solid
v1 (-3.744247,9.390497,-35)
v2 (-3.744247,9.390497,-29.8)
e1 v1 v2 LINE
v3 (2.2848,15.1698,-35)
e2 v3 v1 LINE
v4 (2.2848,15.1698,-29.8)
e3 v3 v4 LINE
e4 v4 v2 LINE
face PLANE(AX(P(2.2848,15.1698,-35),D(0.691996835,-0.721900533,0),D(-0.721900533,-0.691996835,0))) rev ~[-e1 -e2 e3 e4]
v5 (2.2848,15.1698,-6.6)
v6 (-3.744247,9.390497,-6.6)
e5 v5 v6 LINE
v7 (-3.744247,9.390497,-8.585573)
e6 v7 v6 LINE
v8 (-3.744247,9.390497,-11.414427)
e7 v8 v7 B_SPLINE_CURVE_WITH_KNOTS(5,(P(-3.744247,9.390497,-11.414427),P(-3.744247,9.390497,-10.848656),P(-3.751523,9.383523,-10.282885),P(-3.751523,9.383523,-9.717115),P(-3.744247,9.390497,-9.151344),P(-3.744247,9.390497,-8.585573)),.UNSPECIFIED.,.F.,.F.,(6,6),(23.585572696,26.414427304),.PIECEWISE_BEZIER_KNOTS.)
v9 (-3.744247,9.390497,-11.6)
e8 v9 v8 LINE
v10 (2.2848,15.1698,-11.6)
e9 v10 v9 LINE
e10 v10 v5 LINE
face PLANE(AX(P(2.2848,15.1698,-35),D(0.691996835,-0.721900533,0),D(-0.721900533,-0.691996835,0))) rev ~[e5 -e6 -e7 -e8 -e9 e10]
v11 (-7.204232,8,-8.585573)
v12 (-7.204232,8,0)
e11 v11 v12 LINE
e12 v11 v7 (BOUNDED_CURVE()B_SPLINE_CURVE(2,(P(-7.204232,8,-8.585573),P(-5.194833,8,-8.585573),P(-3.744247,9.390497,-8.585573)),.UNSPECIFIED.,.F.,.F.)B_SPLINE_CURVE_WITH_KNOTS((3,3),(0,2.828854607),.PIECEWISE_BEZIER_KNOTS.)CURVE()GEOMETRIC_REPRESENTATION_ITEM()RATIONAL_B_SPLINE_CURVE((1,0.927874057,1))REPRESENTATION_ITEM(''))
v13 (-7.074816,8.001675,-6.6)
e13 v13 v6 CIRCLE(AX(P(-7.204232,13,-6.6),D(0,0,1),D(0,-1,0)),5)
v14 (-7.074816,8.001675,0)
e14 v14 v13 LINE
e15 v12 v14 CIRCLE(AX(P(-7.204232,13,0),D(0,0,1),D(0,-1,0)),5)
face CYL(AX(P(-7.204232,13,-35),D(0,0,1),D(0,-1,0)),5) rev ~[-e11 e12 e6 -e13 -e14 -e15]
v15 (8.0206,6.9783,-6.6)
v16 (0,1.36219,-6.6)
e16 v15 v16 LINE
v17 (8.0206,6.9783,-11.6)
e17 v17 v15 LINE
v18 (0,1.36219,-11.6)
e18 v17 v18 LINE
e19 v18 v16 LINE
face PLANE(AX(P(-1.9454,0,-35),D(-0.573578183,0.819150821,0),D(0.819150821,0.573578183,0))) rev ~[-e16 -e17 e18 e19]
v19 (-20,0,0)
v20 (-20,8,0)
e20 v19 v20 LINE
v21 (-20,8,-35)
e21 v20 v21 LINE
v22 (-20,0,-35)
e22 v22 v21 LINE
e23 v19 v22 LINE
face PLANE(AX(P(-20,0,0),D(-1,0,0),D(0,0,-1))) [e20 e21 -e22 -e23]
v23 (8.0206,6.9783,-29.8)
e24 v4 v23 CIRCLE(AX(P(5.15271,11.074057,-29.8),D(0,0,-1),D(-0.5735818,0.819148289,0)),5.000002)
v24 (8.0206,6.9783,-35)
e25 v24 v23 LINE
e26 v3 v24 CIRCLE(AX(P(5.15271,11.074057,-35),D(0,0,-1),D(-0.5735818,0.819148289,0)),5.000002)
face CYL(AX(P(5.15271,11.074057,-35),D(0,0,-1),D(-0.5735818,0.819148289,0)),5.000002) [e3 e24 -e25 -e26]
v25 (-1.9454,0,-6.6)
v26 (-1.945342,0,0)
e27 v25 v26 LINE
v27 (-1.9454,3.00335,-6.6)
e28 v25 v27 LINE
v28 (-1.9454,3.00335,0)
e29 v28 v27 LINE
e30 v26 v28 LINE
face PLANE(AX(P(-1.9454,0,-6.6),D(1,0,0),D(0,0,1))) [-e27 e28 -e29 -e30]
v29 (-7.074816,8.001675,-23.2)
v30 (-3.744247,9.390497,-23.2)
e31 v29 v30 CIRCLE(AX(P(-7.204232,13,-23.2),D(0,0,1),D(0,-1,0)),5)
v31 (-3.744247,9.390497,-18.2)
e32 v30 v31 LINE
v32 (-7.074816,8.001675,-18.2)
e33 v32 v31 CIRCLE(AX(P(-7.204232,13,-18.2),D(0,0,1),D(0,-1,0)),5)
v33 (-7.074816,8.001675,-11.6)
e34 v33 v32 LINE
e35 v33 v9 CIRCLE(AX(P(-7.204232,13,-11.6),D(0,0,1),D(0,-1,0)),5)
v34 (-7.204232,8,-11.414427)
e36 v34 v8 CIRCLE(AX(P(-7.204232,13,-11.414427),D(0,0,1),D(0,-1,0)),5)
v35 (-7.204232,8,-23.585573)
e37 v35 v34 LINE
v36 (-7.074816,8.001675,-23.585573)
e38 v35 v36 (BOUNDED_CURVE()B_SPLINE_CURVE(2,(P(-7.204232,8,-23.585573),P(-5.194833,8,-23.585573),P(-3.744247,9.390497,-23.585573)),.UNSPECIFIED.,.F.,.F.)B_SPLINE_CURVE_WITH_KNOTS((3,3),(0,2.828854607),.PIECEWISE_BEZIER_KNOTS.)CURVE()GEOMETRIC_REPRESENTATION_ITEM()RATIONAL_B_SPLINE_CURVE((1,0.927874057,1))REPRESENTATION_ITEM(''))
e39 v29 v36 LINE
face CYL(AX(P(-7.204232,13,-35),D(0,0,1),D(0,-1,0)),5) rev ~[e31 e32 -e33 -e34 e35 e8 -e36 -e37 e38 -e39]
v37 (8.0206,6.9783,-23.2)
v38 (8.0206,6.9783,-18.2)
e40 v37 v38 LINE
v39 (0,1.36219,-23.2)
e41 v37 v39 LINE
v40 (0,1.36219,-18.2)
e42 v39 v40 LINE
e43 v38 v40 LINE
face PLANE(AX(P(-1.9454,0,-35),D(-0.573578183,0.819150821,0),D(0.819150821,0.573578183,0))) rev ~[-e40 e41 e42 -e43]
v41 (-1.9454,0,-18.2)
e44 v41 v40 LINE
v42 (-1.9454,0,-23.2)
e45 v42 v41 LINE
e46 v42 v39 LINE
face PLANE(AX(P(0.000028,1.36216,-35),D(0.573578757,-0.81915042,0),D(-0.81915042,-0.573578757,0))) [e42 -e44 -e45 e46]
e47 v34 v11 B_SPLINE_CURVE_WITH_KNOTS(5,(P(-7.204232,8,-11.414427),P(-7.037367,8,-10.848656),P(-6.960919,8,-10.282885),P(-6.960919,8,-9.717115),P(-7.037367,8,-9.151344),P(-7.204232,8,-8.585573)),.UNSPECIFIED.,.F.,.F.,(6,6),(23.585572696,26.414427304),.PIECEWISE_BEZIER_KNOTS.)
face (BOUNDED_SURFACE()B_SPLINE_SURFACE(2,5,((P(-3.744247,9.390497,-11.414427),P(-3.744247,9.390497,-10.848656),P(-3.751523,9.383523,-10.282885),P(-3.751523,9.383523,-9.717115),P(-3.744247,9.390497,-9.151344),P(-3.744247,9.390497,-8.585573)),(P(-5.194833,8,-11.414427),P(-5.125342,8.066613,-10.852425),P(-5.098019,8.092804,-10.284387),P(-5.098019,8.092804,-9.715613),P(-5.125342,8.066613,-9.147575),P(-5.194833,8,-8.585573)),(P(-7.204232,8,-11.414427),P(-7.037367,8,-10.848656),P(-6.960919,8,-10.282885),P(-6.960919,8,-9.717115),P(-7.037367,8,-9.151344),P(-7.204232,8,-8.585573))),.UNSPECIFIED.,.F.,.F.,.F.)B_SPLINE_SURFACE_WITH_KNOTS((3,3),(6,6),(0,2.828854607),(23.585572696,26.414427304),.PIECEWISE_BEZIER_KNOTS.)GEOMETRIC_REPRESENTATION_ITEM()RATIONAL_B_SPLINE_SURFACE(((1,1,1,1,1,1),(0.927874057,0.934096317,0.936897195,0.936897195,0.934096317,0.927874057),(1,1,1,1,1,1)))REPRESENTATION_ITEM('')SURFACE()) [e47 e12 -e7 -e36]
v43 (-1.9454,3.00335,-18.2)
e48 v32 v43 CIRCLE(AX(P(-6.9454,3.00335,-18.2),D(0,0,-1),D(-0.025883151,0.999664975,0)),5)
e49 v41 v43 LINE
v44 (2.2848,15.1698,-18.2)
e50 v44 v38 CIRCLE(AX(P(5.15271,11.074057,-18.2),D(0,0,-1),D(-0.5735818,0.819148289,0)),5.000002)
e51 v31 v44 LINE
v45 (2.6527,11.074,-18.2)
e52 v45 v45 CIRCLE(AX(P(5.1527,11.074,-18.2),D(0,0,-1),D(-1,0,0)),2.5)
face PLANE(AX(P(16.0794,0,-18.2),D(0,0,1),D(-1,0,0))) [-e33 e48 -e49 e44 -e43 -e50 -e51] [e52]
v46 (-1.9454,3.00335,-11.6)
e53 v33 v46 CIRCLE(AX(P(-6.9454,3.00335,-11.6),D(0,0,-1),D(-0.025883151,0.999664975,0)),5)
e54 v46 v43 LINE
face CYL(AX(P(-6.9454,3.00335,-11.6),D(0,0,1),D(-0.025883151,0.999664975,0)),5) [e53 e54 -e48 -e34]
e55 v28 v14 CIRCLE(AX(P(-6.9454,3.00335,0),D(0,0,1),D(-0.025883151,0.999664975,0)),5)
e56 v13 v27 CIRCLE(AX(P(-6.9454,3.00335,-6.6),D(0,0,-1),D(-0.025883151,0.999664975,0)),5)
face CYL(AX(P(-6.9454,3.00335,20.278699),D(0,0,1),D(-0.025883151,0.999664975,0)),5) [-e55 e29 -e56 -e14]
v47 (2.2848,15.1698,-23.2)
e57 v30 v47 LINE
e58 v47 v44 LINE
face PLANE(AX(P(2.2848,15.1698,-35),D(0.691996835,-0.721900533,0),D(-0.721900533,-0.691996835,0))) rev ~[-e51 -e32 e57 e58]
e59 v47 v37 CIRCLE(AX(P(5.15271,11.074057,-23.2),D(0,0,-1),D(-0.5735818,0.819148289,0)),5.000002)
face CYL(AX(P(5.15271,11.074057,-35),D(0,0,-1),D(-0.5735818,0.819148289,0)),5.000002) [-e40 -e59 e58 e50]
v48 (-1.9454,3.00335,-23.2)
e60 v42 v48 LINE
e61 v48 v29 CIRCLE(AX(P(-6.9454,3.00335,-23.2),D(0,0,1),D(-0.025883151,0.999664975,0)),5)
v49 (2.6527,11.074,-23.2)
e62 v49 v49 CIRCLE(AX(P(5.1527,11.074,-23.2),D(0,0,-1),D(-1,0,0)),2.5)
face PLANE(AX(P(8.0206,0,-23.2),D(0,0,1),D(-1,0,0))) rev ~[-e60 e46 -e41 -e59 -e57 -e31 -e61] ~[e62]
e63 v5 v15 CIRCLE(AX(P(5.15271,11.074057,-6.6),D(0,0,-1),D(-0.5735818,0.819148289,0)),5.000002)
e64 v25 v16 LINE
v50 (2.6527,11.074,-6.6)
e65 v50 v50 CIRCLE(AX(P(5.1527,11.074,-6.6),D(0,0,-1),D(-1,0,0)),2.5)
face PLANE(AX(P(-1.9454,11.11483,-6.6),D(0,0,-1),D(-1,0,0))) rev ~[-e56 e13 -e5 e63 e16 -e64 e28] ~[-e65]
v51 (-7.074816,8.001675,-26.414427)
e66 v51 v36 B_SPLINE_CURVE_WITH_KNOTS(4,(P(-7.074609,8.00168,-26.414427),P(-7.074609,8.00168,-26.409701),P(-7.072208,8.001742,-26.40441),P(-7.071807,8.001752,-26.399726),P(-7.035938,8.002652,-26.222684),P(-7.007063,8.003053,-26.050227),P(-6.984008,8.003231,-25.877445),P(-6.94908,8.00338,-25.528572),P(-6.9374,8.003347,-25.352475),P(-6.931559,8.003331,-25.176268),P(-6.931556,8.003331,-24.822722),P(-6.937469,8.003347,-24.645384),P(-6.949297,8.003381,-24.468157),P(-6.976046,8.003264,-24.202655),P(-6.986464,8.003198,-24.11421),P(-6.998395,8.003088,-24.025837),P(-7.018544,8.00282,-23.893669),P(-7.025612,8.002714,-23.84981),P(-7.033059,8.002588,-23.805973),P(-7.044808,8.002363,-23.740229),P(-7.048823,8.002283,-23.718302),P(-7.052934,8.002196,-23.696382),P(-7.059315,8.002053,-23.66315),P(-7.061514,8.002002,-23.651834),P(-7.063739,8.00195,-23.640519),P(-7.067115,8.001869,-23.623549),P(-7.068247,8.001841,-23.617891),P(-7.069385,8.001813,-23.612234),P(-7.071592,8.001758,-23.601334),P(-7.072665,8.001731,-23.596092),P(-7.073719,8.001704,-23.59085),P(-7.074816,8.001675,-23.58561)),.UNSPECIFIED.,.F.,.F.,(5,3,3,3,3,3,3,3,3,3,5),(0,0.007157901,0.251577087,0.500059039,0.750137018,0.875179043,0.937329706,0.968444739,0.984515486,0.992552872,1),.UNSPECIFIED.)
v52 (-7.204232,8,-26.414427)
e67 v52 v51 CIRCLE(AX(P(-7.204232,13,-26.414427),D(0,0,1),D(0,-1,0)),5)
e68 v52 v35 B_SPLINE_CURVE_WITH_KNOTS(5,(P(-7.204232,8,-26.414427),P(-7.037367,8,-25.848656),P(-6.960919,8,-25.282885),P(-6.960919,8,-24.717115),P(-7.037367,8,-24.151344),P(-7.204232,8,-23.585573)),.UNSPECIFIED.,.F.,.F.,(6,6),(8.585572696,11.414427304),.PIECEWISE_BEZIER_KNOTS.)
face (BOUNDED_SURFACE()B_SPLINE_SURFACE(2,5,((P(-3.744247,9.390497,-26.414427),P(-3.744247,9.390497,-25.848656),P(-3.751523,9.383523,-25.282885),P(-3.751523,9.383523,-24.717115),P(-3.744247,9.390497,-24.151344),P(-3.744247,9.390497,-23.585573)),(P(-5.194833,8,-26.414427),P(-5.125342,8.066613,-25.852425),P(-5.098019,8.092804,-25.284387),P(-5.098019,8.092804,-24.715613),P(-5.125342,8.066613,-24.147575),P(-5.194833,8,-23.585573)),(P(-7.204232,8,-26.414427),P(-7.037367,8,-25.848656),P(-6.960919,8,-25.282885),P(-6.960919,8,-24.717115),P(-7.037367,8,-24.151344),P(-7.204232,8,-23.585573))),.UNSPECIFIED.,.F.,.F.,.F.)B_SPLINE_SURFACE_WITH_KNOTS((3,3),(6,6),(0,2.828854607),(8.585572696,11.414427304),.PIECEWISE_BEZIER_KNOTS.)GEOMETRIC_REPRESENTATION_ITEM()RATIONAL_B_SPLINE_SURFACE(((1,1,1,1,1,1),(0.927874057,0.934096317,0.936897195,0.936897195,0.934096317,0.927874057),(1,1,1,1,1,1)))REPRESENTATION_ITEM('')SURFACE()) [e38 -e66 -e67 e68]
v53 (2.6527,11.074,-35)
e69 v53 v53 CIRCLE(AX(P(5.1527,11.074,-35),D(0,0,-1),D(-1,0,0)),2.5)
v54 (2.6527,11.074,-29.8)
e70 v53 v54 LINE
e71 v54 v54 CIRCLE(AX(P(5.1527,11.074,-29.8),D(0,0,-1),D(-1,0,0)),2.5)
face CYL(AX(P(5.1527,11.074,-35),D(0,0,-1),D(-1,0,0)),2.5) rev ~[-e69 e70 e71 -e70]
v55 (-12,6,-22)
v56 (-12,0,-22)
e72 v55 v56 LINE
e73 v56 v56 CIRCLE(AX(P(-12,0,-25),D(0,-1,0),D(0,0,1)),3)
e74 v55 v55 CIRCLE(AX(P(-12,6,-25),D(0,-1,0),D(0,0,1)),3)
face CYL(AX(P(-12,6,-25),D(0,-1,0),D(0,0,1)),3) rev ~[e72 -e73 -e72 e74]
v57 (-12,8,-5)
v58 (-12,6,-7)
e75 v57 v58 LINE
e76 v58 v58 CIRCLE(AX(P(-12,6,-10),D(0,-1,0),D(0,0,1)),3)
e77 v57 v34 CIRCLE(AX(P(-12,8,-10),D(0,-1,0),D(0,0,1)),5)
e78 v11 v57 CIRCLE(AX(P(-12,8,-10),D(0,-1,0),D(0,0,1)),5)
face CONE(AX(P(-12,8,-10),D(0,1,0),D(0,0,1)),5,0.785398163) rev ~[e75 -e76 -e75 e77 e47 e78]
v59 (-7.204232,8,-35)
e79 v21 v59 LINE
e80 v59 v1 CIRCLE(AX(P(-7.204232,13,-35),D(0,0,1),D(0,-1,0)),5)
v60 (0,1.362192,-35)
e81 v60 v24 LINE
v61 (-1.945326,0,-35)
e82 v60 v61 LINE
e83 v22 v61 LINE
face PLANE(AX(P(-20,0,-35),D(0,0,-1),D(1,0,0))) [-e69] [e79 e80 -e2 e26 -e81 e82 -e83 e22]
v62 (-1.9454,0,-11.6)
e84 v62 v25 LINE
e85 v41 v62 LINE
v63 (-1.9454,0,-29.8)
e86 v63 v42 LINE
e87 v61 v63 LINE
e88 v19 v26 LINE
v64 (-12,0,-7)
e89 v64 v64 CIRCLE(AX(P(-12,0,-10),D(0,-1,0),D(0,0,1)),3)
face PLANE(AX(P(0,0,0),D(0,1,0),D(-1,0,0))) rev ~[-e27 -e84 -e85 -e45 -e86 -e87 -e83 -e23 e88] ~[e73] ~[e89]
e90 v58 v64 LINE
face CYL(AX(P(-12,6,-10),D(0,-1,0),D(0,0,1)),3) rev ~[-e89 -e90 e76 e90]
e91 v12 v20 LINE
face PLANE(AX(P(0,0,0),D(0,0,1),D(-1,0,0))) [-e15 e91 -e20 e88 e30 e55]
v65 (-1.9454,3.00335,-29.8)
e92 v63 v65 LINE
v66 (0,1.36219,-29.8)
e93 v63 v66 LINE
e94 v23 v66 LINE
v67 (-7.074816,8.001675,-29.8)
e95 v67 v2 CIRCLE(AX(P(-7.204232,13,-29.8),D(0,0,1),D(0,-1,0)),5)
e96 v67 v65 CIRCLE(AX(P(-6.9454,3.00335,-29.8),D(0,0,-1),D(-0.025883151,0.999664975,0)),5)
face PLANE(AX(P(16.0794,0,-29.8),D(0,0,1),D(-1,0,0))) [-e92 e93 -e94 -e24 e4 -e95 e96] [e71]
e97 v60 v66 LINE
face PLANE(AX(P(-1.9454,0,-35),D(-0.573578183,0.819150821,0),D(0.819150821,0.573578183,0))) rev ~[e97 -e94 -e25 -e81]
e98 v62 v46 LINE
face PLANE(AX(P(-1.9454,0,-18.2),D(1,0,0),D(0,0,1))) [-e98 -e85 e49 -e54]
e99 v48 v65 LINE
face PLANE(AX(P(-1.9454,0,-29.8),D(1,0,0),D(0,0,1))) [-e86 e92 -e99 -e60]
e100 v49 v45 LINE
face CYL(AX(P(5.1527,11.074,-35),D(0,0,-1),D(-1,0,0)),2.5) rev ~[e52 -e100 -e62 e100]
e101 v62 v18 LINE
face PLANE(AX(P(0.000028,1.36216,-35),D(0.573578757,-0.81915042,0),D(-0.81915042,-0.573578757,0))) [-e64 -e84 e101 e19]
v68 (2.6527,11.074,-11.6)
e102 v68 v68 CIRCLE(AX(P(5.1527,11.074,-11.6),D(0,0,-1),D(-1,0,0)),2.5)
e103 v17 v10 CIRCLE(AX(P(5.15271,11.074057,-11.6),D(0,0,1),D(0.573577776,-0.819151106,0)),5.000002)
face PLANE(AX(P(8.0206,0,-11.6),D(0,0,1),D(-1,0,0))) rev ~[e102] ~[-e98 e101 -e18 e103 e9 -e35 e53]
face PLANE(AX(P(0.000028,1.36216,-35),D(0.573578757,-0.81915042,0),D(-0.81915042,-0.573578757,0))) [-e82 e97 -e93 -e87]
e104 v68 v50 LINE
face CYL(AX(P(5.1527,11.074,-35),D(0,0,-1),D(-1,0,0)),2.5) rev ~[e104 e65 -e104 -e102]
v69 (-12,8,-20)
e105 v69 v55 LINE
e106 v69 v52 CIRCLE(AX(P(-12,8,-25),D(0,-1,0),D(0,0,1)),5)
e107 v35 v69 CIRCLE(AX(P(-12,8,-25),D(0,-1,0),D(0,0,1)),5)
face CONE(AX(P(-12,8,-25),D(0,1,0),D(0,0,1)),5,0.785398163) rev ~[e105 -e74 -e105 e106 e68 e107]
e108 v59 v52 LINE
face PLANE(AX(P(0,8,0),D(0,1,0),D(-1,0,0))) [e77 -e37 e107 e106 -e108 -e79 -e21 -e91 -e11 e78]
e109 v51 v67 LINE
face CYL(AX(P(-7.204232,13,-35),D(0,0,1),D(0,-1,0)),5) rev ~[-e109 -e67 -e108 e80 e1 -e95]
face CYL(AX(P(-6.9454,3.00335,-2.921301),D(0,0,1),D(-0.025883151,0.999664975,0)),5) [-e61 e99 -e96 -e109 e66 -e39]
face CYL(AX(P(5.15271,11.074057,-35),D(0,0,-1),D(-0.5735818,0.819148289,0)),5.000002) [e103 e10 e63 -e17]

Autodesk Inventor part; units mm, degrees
ref_plane "YZ Plane" through (0, 0, 0) normal (1, 0, 0) x (0, 1, 0)
ref_plane "XZ Plane" through (0, 0, 0) normal (0, 1, 0) x (-1, 0, 0)
ref_plane "XY Plane" through (0, 0, 0) normal (0, 0, 1) x (1, 0, 0)
sketch "Sketch2" plane through (0, 0, 0) normal (0, 1, 0) x (-1, 0, 0)
  line L0 (0, 0) -> (20, 0)
  line L1 (20, 0) -> (20, -35)
  line L2 (20, -35) -> (0, -35)
  line L3 (0, -35) -> (0, 0)
  dimension "d0" = 35
  dimension "d1" = 20
extrude "Extrusion1" add sketch "Sketch2" along normal blind 8
sketch "Sketch3" plane through (0, 0, -35) normal (0, 0, -1) x (-1, 0, 0)
  line L0 (0, 0) -> (20, 0) projected
  line L1 (1.9454, 0) -> (-8.0206, 6.9783)
  line L2 (-8.0206, 6.9783) -> (-2.2848, 15.1698) construction
  line L3 (-2.2848, 15.1698) -> (7.9547, 8)
  line L4 (0, 8) -> (20, 8) projected
  arc A0 (-2.2848, 15.1698) -> (-8.0206, 6.9783) centre (-5.1527, 11.074) ccw
  circle A1 centre (-5.1527, 11.074) radius 2.5
  line L5 (0, 0) -> (0, 8) construction
  line L6 (-5.1527, 11.074) -> (0, 8) construction
  line L7 (1.9454, 0) -> (7.9547, 8)
  line L8 (-2.2848, 15.1698) -> (6.7994, 6.4619)
  dimension "d4" = 5
  dimension "d5" = 10
  dimension "d6" = 6
  dimension "d21" = 35
extrude "Extrusion2" add sketch "Sketch3" against normal up to surface (35 mm away) contours L1 A0 L8 L7
sketch "Sketch4" plane through (0, 0, -35) normal (0, 0, -1) x (-1, 0, 0)
  line L0 (-8.0206, 6.9783) -> (0, 1.3622) projected
  line L1 (-4.533, 4.5362) -> (4.5811, -1.8456)
  line L2 (4.5811, -1.8456) -> (-4.9445, -1.8456)
  line L3 (-4.9445, -1.8456) -> (-4.533, 4.5362)
  point P0 (0, 0)
  point P1 (0, 1.3622)
extrude "Extrusion3" cut sketch "Sketch4" against normal up to next
sketch "Sketch5" plane through (0, 8, 0) normal (0, 1, 0) x (1, 0, 0)
  line L0 (-5.1948, 35) -> (-20, 35) construction
  line L1 (-12, 35) -> (-12, 25) construction
  line L2 (-12, 25) -> (-12, 10) construction
  line L3 (-20, 35) -> (-20, 0) construction
  point P0 (0, 0)
  point P1 (-7.9547, 35)
  dimension "d11" = 10
  dimension "d12" = 15
  dimension "d13" = 8
hole "Hole1" at (-12, 8, -25) at (-12, 8, -10) direction (0, -1, 0) diameter 6 end through all countersink diameter 10 countersink angle 90
fillet "Fillet1" radius 5 1 edges at (-5.1948, 8, -17.5)
sketch "Sketch6" plane through (0, 0, 0) normal (0, -1, 0) x (1, 0, 0)
  line L0 (8.0206, 0) -> (-1.9454, 0) projected
  line L1 (-1.9454, 0) -> (16.0794, 0)
  line L2 (16.0794, 0) -> (16.0794, -6.6)
  line L3 (16.0794, -6.6) -> (-1.9454, -6.6)
  line L4 (-1.9454, -6.6) -> (-1.9454, 0)
  point P0 (0, 0)
  dimension "d23" = 6.6
extrude "Extrusion4" cut sketch "Sketch6" against normal up to next
fillet "Fillet2" radius 5 1 edges at (-1.9454, 11.1148, -3.3)
pattern_linear "Rectangular Pattern1" count 3 spacing 11.6 along (0, 0, -1) of "Extrusion4", "Fillet2"
properties part number "halfhinge"
